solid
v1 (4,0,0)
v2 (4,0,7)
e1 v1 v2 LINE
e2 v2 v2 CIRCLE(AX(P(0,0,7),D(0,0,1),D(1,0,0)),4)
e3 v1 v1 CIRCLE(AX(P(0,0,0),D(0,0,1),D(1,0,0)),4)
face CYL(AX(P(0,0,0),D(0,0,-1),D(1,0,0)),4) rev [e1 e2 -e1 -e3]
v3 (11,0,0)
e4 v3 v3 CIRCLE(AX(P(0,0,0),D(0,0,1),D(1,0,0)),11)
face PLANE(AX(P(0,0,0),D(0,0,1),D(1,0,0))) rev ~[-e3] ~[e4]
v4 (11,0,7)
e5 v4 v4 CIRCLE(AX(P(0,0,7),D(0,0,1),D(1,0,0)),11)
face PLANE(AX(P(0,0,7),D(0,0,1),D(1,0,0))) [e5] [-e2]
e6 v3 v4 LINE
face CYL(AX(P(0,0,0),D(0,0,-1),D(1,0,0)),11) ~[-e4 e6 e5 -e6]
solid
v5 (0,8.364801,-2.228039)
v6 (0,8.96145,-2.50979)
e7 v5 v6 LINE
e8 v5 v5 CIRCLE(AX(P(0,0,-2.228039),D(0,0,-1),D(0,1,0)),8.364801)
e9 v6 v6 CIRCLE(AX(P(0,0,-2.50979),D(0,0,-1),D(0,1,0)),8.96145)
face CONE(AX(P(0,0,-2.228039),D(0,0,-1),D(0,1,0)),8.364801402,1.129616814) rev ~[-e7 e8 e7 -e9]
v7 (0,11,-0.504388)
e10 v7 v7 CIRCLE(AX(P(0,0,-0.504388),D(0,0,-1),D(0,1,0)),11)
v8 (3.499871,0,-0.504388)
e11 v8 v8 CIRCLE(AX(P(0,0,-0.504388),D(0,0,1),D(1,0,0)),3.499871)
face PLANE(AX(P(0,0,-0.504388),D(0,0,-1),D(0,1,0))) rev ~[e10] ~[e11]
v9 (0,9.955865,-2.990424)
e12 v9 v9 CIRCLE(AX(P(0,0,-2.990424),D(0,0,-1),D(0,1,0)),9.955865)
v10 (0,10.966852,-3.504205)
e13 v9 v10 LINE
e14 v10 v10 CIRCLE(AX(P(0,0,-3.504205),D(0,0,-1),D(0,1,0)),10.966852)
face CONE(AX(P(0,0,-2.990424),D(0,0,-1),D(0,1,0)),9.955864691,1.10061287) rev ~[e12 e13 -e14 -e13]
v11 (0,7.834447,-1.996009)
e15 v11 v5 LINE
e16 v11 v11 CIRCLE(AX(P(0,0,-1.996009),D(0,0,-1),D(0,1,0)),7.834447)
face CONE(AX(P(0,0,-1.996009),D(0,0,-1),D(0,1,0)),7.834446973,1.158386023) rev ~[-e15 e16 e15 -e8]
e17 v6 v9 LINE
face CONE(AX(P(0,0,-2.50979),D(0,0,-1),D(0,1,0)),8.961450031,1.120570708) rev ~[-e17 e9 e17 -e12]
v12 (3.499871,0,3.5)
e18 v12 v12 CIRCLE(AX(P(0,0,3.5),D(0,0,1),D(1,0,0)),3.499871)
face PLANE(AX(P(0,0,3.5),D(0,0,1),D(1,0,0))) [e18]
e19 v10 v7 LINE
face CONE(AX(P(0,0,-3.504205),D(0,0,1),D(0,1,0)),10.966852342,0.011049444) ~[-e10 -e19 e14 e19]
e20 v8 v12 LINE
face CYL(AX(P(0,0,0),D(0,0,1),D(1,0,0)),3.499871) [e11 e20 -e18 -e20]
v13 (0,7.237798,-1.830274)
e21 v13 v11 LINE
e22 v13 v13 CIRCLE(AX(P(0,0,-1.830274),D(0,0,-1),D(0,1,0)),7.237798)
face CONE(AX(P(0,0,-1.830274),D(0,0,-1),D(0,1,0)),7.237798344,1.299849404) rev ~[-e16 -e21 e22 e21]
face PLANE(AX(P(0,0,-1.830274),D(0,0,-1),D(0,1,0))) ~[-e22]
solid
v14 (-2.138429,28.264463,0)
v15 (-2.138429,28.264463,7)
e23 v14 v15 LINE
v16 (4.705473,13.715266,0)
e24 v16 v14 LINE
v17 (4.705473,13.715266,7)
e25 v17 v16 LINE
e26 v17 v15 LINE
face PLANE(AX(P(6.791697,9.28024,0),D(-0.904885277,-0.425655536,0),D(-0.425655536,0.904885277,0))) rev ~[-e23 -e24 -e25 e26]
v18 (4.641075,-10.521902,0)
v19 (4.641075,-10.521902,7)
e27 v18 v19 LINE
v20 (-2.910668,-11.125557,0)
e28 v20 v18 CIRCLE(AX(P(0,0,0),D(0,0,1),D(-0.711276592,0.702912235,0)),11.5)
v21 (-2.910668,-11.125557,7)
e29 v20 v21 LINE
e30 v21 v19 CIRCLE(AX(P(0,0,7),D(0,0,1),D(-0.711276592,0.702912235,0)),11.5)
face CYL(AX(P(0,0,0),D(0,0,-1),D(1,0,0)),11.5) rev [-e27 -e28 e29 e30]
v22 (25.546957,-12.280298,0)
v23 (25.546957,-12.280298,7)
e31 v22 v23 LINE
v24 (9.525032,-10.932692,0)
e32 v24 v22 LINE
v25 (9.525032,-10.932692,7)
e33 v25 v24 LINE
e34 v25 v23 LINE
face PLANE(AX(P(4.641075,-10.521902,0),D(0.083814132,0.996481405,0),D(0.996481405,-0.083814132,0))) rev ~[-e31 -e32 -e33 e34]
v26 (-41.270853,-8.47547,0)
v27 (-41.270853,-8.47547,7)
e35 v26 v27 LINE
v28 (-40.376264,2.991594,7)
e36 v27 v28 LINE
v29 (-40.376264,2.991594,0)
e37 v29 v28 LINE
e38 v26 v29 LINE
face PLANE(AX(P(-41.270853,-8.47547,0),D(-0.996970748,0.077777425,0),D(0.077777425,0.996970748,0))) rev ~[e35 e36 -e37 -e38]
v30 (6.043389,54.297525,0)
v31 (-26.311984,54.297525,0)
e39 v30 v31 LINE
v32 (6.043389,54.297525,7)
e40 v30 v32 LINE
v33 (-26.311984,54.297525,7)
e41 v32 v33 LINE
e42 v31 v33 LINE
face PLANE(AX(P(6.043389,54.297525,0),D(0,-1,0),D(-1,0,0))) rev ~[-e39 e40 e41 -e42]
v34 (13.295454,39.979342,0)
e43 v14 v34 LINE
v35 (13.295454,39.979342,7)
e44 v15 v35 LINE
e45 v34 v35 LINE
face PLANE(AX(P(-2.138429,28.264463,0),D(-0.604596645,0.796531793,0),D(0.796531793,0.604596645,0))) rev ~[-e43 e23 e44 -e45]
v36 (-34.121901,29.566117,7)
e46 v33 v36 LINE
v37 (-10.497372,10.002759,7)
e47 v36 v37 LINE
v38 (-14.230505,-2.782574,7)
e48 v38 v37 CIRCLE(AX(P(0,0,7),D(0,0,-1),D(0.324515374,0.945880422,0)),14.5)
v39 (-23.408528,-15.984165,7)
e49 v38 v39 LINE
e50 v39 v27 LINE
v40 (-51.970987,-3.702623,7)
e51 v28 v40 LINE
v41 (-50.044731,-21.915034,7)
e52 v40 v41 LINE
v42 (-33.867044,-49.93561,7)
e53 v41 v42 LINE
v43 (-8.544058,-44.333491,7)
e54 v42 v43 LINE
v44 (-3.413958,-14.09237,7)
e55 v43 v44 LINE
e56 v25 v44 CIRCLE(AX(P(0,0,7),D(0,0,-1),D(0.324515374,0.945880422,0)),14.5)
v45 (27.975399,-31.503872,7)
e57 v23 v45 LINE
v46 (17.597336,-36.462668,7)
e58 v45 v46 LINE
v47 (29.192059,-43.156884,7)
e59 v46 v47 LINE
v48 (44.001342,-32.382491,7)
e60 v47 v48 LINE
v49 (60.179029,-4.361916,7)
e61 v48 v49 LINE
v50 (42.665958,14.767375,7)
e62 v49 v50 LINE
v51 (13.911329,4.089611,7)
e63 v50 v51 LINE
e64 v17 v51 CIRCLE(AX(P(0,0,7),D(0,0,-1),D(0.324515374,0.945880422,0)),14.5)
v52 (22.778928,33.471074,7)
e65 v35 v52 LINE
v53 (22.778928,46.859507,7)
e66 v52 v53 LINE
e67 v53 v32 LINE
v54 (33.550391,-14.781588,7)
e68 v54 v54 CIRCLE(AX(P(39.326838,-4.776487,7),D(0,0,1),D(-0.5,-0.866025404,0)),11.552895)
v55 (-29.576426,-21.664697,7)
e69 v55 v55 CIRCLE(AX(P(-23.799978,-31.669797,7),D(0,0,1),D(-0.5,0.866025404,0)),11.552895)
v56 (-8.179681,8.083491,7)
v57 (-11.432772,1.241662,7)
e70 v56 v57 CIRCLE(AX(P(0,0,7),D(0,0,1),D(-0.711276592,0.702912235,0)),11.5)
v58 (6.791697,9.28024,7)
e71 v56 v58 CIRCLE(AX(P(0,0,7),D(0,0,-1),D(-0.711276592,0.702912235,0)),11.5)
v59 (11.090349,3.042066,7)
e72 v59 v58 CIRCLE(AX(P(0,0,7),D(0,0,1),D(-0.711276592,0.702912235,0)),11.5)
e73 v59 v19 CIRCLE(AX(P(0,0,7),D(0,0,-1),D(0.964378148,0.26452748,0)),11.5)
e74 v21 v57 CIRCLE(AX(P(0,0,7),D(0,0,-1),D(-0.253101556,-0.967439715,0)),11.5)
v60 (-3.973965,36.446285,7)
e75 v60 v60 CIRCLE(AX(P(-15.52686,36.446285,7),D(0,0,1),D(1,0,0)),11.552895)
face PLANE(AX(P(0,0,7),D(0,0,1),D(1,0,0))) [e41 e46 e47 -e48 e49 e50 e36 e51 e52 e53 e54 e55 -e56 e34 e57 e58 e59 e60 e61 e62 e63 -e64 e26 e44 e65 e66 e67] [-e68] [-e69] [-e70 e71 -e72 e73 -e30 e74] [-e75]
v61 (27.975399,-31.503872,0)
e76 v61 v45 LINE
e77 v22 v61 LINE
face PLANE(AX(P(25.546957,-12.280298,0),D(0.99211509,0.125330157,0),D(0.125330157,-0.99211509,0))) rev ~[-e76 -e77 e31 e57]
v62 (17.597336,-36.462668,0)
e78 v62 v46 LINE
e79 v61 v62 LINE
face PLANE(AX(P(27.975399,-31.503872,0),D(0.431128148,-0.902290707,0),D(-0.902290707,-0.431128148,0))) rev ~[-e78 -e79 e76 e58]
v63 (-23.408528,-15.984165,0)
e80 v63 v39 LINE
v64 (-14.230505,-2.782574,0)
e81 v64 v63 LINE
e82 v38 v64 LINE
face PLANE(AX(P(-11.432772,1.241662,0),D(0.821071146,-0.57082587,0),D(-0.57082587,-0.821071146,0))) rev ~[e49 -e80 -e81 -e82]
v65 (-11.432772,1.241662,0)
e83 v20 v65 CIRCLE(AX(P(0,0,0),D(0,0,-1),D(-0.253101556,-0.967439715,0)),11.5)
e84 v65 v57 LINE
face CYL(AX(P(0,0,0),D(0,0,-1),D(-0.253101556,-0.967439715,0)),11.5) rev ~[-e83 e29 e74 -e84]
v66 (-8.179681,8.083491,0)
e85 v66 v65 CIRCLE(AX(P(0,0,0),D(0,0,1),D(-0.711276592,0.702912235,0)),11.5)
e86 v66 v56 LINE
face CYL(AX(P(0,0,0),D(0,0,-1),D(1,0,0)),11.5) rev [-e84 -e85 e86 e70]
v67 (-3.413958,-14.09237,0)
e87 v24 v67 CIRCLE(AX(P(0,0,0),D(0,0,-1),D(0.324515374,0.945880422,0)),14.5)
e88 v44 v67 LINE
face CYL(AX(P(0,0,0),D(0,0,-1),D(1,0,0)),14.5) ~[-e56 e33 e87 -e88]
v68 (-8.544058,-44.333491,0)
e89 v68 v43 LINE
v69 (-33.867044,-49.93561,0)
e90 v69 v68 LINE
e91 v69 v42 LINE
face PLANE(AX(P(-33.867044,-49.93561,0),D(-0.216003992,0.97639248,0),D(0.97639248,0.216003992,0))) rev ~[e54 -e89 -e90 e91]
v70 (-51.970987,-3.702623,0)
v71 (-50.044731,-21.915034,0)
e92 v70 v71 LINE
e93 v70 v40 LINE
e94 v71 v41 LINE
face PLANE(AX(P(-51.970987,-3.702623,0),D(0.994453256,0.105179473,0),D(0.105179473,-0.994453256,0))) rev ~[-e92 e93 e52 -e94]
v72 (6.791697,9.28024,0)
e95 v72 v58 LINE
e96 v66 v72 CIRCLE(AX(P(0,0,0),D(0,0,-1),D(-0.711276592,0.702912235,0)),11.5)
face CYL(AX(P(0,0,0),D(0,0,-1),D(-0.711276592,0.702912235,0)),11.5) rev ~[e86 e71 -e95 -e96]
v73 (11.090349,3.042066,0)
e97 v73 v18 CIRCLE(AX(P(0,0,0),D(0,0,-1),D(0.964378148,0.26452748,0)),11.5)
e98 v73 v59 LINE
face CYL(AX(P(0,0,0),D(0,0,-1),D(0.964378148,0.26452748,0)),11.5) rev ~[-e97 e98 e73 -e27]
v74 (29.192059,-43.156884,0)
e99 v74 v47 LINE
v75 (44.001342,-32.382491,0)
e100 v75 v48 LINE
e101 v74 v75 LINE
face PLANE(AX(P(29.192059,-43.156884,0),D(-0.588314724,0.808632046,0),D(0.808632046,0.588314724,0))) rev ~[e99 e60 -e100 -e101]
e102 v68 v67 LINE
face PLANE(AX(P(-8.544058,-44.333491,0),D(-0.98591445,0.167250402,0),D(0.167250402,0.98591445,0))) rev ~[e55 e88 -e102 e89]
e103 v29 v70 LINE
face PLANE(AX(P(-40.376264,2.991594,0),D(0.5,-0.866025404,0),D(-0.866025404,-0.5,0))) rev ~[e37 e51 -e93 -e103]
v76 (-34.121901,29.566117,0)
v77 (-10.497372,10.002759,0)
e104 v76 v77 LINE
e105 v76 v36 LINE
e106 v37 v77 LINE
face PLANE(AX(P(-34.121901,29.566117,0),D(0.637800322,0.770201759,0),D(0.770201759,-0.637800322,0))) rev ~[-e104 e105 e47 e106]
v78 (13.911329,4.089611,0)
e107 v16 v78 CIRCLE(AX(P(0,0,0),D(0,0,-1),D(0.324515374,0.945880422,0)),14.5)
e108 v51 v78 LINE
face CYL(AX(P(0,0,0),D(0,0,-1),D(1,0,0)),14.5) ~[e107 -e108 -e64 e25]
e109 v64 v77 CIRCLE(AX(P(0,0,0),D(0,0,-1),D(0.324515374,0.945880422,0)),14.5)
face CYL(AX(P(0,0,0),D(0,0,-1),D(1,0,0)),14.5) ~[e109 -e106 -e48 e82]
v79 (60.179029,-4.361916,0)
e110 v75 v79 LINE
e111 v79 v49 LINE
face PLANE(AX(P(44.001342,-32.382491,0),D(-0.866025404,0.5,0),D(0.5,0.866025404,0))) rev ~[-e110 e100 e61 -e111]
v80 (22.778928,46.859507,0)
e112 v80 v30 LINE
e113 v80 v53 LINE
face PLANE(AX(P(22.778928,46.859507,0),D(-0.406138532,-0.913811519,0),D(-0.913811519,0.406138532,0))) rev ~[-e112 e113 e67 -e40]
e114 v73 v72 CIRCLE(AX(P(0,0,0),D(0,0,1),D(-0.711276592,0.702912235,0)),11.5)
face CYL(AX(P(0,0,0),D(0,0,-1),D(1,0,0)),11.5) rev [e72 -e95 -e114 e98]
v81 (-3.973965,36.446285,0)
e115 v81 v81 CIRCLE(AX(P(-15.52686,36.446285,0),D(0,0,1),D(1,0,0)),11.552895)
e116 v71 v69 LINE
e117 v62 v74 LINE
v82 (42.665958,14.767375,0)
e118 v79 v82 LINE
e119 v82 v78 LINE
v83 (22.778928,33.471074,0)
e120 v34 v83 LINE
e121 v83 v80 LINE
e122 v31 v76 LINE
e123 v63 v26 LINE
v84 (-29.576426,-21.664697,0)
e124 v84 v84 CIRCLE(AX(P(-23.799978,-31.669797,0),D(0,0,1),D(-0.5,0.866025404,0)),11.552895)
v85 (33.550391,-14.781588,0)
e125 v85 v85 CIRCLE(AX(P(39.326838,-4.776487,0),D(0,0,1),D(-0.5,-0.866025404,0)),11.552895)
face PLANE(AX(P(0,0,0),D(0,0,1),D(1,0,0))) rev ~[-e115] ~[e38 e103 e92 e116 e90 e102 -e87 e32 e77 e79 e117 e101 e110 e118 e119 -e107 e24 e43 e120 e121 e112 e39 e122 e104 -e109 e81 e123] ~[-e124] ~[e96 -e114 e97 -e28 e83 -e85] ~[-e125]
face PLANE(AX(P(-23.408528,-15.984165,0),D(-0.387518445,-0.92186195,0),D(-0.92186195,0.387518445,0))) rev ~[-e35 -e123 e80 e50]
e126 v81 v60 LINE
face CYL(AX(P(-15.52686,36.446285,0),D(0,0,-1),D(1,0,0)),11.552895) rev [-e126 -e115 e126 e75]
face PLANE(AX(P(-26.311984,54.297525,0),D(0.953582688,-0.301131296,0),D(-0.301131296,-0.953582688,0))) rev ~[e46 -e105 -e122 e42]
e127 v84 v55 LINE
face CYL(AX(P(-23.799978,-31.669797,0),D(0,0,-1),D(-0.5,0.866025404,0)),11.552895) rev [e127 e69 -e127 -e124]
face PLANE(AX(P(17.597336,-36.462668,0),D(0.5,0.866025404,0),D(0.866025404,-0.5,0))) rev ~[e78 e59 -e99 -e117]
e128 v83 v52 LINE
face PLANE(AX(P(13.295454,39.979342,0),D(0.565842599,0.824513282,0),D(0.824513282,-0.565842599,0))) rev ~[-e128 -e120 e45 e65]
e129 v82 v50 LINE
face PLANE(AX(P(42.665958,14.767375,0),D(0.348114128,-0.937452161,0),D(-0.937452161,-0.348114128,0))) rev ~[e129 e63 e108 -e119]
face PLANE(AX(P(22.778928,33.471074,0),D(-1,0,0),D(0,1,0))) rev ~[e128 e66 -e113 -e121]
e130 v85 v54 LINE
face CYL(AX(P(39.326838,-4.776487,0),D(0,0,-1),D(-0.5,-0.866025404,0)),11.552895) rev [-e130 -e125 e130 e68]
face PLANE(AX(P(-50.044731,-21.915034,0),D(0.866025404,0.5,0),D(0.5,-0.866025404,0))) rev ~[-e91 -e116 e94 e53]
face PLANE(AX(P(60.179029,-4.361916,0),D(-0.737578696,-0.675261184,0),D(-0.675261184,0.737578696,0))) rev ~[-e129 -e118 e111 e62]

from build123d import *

# Parameters (mm, degrees)
F0_R            = 11
F0_R_2          = 4
F1_DEPTH        = 7
F3_R            = 14.5
F3_R_2          = 11.5
F4_DEPTH        = 7
F2_R            = 11.5528949888
F5_DEPTH        = 7
F5_COPIES_COUNT = 3
F6_R            = 3.4998709427
F7_DEPTH        = 3.5
F8_DEPTH        = 1


# Not quite as in the source:
# - a pattern or mirror of a feature is missing from the dataset's text; its kind, count and spacing are read off the source's solid


with BuildPart() as f1:
    # F0 (on Top) → F1 (new body)
    with BuildSketch(Plane.XY):
        Circle(F0_R)
        Circle(F0_R_2, mode=Mode.SUBTRACT)
    extrude(amount=F1_DEPTH)


with BuildPart() as f4:
    # F3 (on Top) → F4 (new body)
    with BuildSketch(Plane.XY):
        Circle(F3_R)
        Circle(F3_R_2, mode=Mode.SUBTRACT)
    extrude(amount=F4_DEPTH)

    # F2 (on Top) → F5 (join)
    with BuildSketch(Plane.XY):
        with BuildLine():
            ThreePointArc((-8.1796808061, 8.0834907009), (-0.9163388311, 11.4634341777), (6.7916970403, 9.2802398305))
            Line((6.7916970403, 9.2802398305), (-2.1384290885, 28.2644629478))
            Line((-2.1384290885, 28.2644629478), (13.2954539731, 39.9793423712))
            Line((13.2954539731, 39.9793423712), (22.7789282799, 33.4710739553))
            Line((22.7789282799, 33.4710739553), (22.7789282799, 46.8595065176))
            Line((22.7789282799, 46.8595065176), (6.0433889739, 54.2975254357))
            Line((6.0433889739, 54.2975254357), (-26.3119842857, 54.2975254357))
            Line((-26.3119842857, 54.2975254357), (-34.1219007969, 29.566116631))
            Line((-34.1219007969, 29.566116631), (-8.1796808061, 8.0834907009))
        make_face()
        with Locations((-15.5268600211, 36.4462845027)):
            Circle(F2_R, mode=Mode.SUBTRACT)
    f5 = extrude(amount=F5_DEPTH)

    # F5_copies: F5 ×3 about axis
    f5_copies_axis = Axis((0, 0, 0), (0, 0, 1))
    for i in range(1, F5_COPIES_COUNT):
        add(f5.rotate(f5_copies_axis, i * 360 / F5_COPIES_COUNT))


with BuildPart() as f7:
    # F6 (on Top) → F7 (new body)
    with BuildSketch(Plane.XY):
        Circle(F6_R)
    extrude(amount=F7_DEPTH)

    # F8 (add): a face of the model
    f8_faces = [f7.faces().sort_by_distance(p)[0] for p in [
        (0, 0, 0),
    ]]
    extrude(f8_faces, amount=F8_DEPTH)

    # F9 (on Right) → F10 (revolve)
    with BuildSketch(Plane.YZ):
        Polygon((10.9668523421, -3.5042045906), (11, -0.5043877241), (0, -0.5043877241), (0, -1.8302736931), (7.2377983444, -1.8302736931), (7.8344469729, -1.9960094697), (8.3648014024, -2.2280394454), (8.9614500308, -2.5097902099), (9.9558646908, -2.9904239901), align=None)
    revolve(axis=Axis((0, 0, -1.1673307086), (0, 0, -1)))


solid = Compound([f1.part, f4.part, f7.part])
